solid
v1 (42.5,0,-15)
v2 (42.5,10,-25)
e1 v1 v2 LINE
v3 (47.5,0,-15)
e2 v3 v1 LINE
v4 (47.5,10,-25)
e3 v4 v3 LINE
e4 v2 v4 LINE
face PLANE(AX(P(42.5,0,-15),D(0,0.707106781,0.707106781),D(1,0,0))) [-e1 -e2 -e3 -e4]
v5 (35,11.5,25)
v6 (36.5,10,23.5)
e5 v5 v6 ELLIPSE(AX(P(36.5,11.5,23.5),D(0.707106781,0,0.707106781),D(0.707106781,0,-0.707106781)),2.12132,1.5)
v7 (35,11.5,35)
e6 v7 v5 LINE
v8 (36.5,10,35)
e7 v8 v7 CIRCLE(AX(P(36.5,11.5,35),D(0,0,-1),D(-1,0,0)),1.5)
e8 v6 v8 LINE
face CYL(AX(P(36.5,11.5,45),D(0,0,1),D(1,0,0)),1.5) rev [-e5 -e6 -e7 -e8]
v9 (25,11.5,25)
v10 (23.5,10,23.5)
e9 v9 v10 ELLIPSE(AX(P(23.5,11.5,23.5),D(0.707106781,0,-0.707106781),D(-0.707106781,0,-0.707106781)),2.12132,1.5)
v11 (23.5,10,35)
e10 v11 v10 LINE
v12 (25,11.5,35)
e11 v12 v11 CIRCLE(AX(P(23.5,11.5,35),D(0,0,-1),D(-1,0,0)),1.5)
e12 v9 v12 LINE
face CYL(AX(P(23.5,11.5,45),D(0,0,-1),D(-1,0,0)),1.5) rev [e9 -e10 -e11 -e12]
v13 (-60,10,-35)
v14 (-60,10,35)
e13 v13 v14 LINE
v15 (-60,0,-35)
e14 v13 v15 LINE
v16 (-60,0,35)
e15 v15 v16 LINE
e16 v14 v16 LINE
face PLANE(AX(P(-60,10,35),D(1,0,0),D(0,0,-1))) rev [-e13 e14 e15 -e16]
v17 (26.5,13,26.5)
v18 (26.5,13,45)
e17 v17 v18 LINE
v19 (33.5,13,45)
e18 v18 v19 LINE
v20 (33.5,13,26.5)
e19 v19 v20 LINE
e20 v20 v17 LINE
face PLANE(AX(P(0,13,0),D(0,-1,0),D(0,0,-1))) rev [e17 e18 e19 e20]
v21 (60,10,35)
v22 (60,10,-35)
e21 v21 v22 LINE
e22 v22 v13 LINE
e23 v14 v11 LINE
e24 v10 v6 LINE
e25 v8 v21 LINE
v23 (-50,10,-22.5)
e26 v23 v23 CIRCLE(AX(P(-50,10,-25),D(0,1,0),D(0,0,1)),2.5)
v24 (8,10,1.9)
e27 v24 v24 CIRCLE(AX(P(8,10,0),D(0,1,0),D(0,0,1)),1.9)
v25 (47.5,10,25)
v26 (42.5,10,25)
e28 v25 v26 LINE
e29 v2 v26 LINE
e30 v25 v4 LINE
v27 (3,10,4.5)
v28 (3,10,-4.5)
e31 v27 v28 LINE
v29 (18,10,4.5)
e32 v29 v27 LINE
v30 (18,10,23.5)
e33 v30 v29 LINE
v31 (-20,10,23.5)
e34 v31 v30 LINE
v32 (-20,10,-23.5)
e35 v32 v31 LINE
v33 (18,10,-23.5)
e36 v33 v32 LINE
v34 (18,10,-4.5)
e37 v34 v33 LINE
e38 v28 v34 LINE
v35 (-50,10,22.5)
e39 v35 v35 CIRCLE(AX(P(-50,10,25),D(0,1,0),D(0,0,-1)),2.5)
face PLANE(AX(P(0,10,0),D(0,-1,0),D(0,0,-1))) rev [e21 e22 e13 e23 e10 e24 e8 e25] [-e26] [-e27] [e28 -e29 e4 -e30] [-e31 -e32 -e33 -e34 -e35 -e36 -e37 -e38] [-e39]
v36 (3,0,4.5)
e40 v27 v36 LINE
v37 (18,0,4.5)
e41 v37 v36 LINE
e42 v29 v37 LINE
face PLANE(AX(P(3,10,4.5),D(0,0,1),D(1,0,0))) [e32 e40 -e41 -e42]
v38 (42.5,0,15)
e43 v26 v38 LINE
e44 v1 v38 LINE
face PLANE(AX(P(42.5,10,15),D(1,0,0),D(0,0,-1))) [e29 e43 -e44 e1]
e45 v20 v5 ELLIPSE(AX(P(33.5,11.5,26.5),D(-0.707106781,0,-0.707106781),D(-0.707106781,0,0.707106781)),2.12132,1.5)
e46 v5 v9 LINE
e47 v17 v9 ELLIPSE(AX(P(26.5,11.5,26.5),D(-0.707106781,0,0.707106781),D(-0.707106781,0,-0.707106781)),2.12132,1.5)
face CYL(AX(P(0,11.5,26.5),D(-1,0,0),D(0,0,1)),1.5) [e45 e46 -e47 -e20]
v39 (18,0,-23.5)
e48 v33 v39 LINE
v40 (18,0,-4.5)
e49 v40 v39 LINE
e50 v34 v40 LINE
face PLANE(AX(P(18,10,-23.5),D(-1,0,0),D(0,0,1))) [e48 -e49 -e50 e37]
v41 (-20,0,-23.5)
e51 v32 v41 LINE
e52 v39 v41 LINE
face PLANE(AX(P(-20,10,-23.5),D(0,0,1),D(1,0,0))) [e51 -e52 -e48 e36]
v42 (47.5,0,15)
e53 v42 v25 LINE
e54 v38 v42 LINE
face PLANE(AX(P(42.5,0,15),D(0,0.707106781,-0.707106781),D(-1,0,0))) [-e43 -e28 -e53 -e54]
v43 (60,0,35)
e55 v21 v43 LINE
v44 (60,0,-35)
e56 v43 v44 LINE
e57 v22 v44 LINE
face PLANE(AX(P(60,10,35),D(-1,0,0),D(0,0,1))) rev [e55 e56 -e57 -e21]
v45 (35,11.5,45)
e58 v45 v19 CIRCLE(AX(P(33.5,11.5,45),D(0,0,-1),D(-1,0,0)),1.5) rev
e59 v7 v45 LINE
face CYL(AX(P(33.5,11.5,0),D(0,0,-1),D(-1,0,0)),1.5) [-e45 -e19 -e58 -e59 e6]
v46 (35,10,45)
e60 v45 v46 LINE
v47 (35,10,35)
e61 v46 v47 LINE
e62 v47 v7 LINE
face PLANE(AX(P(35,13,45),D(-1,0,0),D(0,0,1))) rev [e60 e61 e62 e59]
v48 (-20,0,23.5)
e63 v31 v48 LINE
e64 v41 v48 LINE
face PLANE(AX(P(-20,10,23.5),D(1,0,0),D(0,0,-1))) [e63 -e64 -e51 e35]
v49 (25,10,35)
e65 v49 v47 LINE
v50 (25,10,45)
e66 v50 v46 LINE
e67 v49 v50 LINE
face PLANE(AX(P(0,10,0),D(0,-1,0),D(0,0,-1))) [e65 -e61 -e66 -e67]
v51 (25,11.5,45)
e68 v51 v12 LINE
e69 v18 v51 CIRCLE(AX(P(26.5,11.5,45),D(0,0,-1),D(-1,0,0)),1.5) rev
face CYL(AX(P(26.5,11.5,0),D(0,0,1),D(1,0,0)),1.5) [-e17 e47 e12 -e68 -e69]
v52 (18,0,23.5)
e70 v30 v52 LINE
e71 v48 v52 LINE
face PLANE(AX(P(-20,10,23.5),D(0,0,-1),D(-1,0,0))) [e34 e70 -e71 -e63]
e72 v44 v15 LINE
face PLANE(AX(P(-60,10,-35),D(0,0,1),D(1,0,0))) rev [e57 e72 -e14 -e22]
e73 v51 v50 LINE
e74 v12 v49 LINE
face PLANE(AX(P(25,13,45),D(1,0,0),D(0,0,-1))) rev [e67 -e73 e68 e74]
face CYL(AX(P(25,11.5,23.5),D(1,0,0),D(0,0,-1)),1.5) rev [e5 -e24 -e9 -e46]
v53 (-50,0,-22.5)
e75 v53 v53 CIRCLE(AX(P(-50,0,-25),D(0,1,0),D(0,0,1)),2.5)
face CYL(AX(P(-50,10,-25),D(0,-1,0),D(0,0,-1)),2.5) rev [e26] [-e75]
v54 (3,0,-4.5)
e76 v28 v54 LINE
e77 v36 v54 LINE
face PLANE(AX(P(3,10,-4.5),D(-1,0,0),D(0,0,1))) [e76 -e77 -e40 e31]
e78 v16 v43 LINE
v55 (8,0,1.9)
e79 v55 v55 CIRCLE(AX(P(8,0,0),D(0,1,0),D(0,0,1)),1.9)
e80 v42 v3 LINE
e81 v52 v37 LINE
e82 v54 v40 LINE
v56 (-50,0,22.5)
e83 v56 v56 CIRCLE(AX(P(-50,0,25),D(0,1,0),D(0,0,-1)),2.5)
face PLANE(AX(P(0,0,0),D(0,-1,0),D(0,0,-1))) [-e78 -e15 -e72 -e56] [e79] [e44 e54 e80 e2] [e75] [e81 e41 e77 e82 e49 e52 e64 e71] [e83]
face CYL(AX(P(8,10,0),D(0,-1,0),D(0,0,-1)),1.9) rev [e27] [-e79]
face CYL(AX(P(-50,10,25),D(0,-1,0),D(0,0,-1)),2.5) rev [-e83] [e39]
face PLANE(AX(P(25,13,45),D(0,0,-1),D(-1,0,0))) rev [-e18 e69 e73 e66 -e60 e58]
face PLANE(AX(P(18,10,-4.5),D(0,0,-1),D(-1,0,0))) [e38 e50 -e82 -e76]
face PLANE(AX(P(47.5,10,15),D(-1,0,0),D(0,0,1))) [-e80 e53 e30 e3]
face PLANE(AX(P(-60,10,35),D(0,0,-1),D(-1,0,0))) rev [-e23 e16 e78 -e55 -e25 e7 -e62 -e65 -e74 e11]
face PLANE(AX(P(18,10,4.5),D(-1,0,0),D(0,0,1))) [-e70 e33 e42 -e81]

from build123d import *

# Parameters (mm, degrees)
SKETCH1_W           = 120
SKETCH1_H           = 70
SKETCH1_R           = 2.5
SKETCH1_R_2         = 1.9
SKETCH1_W_2         = 5
SKETCH1_H_2         = 30
BOSS_EXTRUDE1_DEPTH = 10
CHAMFER1_SIZE       = 10
SKETCH3_W           = 10
SKETCH3_H           = 20
BOSS_EXTRUDE2_DEPTH = 3
FILLET1_R           = 1.5


with BuildPart() as part:
    # Sketch1 → Boss-Extrude1 (new body)
    with BuildSketch(Plane(origin=(0, 0, 0), x_dir=(1, 0, 0), z_dir=(0, 1, 0))):
        Rectangle(SKETCH1_W, SKETCH1_H)
        with Locations(Location((-50, 25, 0), (0, 0, 270))):
            Circle(SKETCH1_R, mode=Mode.SUBTRACT)
        with Locations(Location((-50, -25, 0), (0, 0, 90))):
            Circle(SKETCH1_R, mode=Mode.SUBTRACT)
        with Locations(Location((8, 0, 0), (0, 0, 270))):
            Circle(SKETCH1_R_2, mode=Mode.SUBTRACT)
        Polygon((18, 23.5), (18, 4.5), (3, 4.5), (3, -4.5), (18, -4.5), (18, -23.5), (-20, -23.5), (-20, 23.5), align=None, mode=Mode.SUBTRACT)
        with Locations((45, 0)):
            Rectangle(SKETCH1_W_2, SKETCH1_H_2, mode=Mode.SUBTRACT)
    extrude(amount=BOSS_EXTRUDE1_DEPTH)

    # Chamfer1
    chamfer1_edges = [part.edges().sort_by_distance(p)[0] for p in [
        (45, 10, 15),
        (45, 10, -15),
    ]]
    chamfer(chamfer1_edges, length=CHAMFER1_SIZE - 0.0001)  # a hair under: the kernel refuses the full size

    # Sketch3 → Boss-Extrude2 (add)
    with BuildSketch(Plane(origin=(0, 10, 0), x_dir=(1, 0, 0), z_dir=(0, 1, 0))):
        with Locations((30, -35)):
            Rectangle(SKETCH3_W, SKETCH3_H)
    extrude(amount=BOSS_EXTRUDE2_DEPTH)

    # Fillet1
    fillet1_edges = [part.edges().sort_by_distance(p)[0] for p in [
        (25, 13, 35),
        (35, 13, 35),
        (30, 13, 25),
        (35, 10, 30),
        (30, 10, 25),
        (25, 10, 30),
    ]]
    fillet(fillet1_edges, radius=FILLET1_R - 0.0001)  # a hair under: the kernel refuses the full size


solid = part.part
